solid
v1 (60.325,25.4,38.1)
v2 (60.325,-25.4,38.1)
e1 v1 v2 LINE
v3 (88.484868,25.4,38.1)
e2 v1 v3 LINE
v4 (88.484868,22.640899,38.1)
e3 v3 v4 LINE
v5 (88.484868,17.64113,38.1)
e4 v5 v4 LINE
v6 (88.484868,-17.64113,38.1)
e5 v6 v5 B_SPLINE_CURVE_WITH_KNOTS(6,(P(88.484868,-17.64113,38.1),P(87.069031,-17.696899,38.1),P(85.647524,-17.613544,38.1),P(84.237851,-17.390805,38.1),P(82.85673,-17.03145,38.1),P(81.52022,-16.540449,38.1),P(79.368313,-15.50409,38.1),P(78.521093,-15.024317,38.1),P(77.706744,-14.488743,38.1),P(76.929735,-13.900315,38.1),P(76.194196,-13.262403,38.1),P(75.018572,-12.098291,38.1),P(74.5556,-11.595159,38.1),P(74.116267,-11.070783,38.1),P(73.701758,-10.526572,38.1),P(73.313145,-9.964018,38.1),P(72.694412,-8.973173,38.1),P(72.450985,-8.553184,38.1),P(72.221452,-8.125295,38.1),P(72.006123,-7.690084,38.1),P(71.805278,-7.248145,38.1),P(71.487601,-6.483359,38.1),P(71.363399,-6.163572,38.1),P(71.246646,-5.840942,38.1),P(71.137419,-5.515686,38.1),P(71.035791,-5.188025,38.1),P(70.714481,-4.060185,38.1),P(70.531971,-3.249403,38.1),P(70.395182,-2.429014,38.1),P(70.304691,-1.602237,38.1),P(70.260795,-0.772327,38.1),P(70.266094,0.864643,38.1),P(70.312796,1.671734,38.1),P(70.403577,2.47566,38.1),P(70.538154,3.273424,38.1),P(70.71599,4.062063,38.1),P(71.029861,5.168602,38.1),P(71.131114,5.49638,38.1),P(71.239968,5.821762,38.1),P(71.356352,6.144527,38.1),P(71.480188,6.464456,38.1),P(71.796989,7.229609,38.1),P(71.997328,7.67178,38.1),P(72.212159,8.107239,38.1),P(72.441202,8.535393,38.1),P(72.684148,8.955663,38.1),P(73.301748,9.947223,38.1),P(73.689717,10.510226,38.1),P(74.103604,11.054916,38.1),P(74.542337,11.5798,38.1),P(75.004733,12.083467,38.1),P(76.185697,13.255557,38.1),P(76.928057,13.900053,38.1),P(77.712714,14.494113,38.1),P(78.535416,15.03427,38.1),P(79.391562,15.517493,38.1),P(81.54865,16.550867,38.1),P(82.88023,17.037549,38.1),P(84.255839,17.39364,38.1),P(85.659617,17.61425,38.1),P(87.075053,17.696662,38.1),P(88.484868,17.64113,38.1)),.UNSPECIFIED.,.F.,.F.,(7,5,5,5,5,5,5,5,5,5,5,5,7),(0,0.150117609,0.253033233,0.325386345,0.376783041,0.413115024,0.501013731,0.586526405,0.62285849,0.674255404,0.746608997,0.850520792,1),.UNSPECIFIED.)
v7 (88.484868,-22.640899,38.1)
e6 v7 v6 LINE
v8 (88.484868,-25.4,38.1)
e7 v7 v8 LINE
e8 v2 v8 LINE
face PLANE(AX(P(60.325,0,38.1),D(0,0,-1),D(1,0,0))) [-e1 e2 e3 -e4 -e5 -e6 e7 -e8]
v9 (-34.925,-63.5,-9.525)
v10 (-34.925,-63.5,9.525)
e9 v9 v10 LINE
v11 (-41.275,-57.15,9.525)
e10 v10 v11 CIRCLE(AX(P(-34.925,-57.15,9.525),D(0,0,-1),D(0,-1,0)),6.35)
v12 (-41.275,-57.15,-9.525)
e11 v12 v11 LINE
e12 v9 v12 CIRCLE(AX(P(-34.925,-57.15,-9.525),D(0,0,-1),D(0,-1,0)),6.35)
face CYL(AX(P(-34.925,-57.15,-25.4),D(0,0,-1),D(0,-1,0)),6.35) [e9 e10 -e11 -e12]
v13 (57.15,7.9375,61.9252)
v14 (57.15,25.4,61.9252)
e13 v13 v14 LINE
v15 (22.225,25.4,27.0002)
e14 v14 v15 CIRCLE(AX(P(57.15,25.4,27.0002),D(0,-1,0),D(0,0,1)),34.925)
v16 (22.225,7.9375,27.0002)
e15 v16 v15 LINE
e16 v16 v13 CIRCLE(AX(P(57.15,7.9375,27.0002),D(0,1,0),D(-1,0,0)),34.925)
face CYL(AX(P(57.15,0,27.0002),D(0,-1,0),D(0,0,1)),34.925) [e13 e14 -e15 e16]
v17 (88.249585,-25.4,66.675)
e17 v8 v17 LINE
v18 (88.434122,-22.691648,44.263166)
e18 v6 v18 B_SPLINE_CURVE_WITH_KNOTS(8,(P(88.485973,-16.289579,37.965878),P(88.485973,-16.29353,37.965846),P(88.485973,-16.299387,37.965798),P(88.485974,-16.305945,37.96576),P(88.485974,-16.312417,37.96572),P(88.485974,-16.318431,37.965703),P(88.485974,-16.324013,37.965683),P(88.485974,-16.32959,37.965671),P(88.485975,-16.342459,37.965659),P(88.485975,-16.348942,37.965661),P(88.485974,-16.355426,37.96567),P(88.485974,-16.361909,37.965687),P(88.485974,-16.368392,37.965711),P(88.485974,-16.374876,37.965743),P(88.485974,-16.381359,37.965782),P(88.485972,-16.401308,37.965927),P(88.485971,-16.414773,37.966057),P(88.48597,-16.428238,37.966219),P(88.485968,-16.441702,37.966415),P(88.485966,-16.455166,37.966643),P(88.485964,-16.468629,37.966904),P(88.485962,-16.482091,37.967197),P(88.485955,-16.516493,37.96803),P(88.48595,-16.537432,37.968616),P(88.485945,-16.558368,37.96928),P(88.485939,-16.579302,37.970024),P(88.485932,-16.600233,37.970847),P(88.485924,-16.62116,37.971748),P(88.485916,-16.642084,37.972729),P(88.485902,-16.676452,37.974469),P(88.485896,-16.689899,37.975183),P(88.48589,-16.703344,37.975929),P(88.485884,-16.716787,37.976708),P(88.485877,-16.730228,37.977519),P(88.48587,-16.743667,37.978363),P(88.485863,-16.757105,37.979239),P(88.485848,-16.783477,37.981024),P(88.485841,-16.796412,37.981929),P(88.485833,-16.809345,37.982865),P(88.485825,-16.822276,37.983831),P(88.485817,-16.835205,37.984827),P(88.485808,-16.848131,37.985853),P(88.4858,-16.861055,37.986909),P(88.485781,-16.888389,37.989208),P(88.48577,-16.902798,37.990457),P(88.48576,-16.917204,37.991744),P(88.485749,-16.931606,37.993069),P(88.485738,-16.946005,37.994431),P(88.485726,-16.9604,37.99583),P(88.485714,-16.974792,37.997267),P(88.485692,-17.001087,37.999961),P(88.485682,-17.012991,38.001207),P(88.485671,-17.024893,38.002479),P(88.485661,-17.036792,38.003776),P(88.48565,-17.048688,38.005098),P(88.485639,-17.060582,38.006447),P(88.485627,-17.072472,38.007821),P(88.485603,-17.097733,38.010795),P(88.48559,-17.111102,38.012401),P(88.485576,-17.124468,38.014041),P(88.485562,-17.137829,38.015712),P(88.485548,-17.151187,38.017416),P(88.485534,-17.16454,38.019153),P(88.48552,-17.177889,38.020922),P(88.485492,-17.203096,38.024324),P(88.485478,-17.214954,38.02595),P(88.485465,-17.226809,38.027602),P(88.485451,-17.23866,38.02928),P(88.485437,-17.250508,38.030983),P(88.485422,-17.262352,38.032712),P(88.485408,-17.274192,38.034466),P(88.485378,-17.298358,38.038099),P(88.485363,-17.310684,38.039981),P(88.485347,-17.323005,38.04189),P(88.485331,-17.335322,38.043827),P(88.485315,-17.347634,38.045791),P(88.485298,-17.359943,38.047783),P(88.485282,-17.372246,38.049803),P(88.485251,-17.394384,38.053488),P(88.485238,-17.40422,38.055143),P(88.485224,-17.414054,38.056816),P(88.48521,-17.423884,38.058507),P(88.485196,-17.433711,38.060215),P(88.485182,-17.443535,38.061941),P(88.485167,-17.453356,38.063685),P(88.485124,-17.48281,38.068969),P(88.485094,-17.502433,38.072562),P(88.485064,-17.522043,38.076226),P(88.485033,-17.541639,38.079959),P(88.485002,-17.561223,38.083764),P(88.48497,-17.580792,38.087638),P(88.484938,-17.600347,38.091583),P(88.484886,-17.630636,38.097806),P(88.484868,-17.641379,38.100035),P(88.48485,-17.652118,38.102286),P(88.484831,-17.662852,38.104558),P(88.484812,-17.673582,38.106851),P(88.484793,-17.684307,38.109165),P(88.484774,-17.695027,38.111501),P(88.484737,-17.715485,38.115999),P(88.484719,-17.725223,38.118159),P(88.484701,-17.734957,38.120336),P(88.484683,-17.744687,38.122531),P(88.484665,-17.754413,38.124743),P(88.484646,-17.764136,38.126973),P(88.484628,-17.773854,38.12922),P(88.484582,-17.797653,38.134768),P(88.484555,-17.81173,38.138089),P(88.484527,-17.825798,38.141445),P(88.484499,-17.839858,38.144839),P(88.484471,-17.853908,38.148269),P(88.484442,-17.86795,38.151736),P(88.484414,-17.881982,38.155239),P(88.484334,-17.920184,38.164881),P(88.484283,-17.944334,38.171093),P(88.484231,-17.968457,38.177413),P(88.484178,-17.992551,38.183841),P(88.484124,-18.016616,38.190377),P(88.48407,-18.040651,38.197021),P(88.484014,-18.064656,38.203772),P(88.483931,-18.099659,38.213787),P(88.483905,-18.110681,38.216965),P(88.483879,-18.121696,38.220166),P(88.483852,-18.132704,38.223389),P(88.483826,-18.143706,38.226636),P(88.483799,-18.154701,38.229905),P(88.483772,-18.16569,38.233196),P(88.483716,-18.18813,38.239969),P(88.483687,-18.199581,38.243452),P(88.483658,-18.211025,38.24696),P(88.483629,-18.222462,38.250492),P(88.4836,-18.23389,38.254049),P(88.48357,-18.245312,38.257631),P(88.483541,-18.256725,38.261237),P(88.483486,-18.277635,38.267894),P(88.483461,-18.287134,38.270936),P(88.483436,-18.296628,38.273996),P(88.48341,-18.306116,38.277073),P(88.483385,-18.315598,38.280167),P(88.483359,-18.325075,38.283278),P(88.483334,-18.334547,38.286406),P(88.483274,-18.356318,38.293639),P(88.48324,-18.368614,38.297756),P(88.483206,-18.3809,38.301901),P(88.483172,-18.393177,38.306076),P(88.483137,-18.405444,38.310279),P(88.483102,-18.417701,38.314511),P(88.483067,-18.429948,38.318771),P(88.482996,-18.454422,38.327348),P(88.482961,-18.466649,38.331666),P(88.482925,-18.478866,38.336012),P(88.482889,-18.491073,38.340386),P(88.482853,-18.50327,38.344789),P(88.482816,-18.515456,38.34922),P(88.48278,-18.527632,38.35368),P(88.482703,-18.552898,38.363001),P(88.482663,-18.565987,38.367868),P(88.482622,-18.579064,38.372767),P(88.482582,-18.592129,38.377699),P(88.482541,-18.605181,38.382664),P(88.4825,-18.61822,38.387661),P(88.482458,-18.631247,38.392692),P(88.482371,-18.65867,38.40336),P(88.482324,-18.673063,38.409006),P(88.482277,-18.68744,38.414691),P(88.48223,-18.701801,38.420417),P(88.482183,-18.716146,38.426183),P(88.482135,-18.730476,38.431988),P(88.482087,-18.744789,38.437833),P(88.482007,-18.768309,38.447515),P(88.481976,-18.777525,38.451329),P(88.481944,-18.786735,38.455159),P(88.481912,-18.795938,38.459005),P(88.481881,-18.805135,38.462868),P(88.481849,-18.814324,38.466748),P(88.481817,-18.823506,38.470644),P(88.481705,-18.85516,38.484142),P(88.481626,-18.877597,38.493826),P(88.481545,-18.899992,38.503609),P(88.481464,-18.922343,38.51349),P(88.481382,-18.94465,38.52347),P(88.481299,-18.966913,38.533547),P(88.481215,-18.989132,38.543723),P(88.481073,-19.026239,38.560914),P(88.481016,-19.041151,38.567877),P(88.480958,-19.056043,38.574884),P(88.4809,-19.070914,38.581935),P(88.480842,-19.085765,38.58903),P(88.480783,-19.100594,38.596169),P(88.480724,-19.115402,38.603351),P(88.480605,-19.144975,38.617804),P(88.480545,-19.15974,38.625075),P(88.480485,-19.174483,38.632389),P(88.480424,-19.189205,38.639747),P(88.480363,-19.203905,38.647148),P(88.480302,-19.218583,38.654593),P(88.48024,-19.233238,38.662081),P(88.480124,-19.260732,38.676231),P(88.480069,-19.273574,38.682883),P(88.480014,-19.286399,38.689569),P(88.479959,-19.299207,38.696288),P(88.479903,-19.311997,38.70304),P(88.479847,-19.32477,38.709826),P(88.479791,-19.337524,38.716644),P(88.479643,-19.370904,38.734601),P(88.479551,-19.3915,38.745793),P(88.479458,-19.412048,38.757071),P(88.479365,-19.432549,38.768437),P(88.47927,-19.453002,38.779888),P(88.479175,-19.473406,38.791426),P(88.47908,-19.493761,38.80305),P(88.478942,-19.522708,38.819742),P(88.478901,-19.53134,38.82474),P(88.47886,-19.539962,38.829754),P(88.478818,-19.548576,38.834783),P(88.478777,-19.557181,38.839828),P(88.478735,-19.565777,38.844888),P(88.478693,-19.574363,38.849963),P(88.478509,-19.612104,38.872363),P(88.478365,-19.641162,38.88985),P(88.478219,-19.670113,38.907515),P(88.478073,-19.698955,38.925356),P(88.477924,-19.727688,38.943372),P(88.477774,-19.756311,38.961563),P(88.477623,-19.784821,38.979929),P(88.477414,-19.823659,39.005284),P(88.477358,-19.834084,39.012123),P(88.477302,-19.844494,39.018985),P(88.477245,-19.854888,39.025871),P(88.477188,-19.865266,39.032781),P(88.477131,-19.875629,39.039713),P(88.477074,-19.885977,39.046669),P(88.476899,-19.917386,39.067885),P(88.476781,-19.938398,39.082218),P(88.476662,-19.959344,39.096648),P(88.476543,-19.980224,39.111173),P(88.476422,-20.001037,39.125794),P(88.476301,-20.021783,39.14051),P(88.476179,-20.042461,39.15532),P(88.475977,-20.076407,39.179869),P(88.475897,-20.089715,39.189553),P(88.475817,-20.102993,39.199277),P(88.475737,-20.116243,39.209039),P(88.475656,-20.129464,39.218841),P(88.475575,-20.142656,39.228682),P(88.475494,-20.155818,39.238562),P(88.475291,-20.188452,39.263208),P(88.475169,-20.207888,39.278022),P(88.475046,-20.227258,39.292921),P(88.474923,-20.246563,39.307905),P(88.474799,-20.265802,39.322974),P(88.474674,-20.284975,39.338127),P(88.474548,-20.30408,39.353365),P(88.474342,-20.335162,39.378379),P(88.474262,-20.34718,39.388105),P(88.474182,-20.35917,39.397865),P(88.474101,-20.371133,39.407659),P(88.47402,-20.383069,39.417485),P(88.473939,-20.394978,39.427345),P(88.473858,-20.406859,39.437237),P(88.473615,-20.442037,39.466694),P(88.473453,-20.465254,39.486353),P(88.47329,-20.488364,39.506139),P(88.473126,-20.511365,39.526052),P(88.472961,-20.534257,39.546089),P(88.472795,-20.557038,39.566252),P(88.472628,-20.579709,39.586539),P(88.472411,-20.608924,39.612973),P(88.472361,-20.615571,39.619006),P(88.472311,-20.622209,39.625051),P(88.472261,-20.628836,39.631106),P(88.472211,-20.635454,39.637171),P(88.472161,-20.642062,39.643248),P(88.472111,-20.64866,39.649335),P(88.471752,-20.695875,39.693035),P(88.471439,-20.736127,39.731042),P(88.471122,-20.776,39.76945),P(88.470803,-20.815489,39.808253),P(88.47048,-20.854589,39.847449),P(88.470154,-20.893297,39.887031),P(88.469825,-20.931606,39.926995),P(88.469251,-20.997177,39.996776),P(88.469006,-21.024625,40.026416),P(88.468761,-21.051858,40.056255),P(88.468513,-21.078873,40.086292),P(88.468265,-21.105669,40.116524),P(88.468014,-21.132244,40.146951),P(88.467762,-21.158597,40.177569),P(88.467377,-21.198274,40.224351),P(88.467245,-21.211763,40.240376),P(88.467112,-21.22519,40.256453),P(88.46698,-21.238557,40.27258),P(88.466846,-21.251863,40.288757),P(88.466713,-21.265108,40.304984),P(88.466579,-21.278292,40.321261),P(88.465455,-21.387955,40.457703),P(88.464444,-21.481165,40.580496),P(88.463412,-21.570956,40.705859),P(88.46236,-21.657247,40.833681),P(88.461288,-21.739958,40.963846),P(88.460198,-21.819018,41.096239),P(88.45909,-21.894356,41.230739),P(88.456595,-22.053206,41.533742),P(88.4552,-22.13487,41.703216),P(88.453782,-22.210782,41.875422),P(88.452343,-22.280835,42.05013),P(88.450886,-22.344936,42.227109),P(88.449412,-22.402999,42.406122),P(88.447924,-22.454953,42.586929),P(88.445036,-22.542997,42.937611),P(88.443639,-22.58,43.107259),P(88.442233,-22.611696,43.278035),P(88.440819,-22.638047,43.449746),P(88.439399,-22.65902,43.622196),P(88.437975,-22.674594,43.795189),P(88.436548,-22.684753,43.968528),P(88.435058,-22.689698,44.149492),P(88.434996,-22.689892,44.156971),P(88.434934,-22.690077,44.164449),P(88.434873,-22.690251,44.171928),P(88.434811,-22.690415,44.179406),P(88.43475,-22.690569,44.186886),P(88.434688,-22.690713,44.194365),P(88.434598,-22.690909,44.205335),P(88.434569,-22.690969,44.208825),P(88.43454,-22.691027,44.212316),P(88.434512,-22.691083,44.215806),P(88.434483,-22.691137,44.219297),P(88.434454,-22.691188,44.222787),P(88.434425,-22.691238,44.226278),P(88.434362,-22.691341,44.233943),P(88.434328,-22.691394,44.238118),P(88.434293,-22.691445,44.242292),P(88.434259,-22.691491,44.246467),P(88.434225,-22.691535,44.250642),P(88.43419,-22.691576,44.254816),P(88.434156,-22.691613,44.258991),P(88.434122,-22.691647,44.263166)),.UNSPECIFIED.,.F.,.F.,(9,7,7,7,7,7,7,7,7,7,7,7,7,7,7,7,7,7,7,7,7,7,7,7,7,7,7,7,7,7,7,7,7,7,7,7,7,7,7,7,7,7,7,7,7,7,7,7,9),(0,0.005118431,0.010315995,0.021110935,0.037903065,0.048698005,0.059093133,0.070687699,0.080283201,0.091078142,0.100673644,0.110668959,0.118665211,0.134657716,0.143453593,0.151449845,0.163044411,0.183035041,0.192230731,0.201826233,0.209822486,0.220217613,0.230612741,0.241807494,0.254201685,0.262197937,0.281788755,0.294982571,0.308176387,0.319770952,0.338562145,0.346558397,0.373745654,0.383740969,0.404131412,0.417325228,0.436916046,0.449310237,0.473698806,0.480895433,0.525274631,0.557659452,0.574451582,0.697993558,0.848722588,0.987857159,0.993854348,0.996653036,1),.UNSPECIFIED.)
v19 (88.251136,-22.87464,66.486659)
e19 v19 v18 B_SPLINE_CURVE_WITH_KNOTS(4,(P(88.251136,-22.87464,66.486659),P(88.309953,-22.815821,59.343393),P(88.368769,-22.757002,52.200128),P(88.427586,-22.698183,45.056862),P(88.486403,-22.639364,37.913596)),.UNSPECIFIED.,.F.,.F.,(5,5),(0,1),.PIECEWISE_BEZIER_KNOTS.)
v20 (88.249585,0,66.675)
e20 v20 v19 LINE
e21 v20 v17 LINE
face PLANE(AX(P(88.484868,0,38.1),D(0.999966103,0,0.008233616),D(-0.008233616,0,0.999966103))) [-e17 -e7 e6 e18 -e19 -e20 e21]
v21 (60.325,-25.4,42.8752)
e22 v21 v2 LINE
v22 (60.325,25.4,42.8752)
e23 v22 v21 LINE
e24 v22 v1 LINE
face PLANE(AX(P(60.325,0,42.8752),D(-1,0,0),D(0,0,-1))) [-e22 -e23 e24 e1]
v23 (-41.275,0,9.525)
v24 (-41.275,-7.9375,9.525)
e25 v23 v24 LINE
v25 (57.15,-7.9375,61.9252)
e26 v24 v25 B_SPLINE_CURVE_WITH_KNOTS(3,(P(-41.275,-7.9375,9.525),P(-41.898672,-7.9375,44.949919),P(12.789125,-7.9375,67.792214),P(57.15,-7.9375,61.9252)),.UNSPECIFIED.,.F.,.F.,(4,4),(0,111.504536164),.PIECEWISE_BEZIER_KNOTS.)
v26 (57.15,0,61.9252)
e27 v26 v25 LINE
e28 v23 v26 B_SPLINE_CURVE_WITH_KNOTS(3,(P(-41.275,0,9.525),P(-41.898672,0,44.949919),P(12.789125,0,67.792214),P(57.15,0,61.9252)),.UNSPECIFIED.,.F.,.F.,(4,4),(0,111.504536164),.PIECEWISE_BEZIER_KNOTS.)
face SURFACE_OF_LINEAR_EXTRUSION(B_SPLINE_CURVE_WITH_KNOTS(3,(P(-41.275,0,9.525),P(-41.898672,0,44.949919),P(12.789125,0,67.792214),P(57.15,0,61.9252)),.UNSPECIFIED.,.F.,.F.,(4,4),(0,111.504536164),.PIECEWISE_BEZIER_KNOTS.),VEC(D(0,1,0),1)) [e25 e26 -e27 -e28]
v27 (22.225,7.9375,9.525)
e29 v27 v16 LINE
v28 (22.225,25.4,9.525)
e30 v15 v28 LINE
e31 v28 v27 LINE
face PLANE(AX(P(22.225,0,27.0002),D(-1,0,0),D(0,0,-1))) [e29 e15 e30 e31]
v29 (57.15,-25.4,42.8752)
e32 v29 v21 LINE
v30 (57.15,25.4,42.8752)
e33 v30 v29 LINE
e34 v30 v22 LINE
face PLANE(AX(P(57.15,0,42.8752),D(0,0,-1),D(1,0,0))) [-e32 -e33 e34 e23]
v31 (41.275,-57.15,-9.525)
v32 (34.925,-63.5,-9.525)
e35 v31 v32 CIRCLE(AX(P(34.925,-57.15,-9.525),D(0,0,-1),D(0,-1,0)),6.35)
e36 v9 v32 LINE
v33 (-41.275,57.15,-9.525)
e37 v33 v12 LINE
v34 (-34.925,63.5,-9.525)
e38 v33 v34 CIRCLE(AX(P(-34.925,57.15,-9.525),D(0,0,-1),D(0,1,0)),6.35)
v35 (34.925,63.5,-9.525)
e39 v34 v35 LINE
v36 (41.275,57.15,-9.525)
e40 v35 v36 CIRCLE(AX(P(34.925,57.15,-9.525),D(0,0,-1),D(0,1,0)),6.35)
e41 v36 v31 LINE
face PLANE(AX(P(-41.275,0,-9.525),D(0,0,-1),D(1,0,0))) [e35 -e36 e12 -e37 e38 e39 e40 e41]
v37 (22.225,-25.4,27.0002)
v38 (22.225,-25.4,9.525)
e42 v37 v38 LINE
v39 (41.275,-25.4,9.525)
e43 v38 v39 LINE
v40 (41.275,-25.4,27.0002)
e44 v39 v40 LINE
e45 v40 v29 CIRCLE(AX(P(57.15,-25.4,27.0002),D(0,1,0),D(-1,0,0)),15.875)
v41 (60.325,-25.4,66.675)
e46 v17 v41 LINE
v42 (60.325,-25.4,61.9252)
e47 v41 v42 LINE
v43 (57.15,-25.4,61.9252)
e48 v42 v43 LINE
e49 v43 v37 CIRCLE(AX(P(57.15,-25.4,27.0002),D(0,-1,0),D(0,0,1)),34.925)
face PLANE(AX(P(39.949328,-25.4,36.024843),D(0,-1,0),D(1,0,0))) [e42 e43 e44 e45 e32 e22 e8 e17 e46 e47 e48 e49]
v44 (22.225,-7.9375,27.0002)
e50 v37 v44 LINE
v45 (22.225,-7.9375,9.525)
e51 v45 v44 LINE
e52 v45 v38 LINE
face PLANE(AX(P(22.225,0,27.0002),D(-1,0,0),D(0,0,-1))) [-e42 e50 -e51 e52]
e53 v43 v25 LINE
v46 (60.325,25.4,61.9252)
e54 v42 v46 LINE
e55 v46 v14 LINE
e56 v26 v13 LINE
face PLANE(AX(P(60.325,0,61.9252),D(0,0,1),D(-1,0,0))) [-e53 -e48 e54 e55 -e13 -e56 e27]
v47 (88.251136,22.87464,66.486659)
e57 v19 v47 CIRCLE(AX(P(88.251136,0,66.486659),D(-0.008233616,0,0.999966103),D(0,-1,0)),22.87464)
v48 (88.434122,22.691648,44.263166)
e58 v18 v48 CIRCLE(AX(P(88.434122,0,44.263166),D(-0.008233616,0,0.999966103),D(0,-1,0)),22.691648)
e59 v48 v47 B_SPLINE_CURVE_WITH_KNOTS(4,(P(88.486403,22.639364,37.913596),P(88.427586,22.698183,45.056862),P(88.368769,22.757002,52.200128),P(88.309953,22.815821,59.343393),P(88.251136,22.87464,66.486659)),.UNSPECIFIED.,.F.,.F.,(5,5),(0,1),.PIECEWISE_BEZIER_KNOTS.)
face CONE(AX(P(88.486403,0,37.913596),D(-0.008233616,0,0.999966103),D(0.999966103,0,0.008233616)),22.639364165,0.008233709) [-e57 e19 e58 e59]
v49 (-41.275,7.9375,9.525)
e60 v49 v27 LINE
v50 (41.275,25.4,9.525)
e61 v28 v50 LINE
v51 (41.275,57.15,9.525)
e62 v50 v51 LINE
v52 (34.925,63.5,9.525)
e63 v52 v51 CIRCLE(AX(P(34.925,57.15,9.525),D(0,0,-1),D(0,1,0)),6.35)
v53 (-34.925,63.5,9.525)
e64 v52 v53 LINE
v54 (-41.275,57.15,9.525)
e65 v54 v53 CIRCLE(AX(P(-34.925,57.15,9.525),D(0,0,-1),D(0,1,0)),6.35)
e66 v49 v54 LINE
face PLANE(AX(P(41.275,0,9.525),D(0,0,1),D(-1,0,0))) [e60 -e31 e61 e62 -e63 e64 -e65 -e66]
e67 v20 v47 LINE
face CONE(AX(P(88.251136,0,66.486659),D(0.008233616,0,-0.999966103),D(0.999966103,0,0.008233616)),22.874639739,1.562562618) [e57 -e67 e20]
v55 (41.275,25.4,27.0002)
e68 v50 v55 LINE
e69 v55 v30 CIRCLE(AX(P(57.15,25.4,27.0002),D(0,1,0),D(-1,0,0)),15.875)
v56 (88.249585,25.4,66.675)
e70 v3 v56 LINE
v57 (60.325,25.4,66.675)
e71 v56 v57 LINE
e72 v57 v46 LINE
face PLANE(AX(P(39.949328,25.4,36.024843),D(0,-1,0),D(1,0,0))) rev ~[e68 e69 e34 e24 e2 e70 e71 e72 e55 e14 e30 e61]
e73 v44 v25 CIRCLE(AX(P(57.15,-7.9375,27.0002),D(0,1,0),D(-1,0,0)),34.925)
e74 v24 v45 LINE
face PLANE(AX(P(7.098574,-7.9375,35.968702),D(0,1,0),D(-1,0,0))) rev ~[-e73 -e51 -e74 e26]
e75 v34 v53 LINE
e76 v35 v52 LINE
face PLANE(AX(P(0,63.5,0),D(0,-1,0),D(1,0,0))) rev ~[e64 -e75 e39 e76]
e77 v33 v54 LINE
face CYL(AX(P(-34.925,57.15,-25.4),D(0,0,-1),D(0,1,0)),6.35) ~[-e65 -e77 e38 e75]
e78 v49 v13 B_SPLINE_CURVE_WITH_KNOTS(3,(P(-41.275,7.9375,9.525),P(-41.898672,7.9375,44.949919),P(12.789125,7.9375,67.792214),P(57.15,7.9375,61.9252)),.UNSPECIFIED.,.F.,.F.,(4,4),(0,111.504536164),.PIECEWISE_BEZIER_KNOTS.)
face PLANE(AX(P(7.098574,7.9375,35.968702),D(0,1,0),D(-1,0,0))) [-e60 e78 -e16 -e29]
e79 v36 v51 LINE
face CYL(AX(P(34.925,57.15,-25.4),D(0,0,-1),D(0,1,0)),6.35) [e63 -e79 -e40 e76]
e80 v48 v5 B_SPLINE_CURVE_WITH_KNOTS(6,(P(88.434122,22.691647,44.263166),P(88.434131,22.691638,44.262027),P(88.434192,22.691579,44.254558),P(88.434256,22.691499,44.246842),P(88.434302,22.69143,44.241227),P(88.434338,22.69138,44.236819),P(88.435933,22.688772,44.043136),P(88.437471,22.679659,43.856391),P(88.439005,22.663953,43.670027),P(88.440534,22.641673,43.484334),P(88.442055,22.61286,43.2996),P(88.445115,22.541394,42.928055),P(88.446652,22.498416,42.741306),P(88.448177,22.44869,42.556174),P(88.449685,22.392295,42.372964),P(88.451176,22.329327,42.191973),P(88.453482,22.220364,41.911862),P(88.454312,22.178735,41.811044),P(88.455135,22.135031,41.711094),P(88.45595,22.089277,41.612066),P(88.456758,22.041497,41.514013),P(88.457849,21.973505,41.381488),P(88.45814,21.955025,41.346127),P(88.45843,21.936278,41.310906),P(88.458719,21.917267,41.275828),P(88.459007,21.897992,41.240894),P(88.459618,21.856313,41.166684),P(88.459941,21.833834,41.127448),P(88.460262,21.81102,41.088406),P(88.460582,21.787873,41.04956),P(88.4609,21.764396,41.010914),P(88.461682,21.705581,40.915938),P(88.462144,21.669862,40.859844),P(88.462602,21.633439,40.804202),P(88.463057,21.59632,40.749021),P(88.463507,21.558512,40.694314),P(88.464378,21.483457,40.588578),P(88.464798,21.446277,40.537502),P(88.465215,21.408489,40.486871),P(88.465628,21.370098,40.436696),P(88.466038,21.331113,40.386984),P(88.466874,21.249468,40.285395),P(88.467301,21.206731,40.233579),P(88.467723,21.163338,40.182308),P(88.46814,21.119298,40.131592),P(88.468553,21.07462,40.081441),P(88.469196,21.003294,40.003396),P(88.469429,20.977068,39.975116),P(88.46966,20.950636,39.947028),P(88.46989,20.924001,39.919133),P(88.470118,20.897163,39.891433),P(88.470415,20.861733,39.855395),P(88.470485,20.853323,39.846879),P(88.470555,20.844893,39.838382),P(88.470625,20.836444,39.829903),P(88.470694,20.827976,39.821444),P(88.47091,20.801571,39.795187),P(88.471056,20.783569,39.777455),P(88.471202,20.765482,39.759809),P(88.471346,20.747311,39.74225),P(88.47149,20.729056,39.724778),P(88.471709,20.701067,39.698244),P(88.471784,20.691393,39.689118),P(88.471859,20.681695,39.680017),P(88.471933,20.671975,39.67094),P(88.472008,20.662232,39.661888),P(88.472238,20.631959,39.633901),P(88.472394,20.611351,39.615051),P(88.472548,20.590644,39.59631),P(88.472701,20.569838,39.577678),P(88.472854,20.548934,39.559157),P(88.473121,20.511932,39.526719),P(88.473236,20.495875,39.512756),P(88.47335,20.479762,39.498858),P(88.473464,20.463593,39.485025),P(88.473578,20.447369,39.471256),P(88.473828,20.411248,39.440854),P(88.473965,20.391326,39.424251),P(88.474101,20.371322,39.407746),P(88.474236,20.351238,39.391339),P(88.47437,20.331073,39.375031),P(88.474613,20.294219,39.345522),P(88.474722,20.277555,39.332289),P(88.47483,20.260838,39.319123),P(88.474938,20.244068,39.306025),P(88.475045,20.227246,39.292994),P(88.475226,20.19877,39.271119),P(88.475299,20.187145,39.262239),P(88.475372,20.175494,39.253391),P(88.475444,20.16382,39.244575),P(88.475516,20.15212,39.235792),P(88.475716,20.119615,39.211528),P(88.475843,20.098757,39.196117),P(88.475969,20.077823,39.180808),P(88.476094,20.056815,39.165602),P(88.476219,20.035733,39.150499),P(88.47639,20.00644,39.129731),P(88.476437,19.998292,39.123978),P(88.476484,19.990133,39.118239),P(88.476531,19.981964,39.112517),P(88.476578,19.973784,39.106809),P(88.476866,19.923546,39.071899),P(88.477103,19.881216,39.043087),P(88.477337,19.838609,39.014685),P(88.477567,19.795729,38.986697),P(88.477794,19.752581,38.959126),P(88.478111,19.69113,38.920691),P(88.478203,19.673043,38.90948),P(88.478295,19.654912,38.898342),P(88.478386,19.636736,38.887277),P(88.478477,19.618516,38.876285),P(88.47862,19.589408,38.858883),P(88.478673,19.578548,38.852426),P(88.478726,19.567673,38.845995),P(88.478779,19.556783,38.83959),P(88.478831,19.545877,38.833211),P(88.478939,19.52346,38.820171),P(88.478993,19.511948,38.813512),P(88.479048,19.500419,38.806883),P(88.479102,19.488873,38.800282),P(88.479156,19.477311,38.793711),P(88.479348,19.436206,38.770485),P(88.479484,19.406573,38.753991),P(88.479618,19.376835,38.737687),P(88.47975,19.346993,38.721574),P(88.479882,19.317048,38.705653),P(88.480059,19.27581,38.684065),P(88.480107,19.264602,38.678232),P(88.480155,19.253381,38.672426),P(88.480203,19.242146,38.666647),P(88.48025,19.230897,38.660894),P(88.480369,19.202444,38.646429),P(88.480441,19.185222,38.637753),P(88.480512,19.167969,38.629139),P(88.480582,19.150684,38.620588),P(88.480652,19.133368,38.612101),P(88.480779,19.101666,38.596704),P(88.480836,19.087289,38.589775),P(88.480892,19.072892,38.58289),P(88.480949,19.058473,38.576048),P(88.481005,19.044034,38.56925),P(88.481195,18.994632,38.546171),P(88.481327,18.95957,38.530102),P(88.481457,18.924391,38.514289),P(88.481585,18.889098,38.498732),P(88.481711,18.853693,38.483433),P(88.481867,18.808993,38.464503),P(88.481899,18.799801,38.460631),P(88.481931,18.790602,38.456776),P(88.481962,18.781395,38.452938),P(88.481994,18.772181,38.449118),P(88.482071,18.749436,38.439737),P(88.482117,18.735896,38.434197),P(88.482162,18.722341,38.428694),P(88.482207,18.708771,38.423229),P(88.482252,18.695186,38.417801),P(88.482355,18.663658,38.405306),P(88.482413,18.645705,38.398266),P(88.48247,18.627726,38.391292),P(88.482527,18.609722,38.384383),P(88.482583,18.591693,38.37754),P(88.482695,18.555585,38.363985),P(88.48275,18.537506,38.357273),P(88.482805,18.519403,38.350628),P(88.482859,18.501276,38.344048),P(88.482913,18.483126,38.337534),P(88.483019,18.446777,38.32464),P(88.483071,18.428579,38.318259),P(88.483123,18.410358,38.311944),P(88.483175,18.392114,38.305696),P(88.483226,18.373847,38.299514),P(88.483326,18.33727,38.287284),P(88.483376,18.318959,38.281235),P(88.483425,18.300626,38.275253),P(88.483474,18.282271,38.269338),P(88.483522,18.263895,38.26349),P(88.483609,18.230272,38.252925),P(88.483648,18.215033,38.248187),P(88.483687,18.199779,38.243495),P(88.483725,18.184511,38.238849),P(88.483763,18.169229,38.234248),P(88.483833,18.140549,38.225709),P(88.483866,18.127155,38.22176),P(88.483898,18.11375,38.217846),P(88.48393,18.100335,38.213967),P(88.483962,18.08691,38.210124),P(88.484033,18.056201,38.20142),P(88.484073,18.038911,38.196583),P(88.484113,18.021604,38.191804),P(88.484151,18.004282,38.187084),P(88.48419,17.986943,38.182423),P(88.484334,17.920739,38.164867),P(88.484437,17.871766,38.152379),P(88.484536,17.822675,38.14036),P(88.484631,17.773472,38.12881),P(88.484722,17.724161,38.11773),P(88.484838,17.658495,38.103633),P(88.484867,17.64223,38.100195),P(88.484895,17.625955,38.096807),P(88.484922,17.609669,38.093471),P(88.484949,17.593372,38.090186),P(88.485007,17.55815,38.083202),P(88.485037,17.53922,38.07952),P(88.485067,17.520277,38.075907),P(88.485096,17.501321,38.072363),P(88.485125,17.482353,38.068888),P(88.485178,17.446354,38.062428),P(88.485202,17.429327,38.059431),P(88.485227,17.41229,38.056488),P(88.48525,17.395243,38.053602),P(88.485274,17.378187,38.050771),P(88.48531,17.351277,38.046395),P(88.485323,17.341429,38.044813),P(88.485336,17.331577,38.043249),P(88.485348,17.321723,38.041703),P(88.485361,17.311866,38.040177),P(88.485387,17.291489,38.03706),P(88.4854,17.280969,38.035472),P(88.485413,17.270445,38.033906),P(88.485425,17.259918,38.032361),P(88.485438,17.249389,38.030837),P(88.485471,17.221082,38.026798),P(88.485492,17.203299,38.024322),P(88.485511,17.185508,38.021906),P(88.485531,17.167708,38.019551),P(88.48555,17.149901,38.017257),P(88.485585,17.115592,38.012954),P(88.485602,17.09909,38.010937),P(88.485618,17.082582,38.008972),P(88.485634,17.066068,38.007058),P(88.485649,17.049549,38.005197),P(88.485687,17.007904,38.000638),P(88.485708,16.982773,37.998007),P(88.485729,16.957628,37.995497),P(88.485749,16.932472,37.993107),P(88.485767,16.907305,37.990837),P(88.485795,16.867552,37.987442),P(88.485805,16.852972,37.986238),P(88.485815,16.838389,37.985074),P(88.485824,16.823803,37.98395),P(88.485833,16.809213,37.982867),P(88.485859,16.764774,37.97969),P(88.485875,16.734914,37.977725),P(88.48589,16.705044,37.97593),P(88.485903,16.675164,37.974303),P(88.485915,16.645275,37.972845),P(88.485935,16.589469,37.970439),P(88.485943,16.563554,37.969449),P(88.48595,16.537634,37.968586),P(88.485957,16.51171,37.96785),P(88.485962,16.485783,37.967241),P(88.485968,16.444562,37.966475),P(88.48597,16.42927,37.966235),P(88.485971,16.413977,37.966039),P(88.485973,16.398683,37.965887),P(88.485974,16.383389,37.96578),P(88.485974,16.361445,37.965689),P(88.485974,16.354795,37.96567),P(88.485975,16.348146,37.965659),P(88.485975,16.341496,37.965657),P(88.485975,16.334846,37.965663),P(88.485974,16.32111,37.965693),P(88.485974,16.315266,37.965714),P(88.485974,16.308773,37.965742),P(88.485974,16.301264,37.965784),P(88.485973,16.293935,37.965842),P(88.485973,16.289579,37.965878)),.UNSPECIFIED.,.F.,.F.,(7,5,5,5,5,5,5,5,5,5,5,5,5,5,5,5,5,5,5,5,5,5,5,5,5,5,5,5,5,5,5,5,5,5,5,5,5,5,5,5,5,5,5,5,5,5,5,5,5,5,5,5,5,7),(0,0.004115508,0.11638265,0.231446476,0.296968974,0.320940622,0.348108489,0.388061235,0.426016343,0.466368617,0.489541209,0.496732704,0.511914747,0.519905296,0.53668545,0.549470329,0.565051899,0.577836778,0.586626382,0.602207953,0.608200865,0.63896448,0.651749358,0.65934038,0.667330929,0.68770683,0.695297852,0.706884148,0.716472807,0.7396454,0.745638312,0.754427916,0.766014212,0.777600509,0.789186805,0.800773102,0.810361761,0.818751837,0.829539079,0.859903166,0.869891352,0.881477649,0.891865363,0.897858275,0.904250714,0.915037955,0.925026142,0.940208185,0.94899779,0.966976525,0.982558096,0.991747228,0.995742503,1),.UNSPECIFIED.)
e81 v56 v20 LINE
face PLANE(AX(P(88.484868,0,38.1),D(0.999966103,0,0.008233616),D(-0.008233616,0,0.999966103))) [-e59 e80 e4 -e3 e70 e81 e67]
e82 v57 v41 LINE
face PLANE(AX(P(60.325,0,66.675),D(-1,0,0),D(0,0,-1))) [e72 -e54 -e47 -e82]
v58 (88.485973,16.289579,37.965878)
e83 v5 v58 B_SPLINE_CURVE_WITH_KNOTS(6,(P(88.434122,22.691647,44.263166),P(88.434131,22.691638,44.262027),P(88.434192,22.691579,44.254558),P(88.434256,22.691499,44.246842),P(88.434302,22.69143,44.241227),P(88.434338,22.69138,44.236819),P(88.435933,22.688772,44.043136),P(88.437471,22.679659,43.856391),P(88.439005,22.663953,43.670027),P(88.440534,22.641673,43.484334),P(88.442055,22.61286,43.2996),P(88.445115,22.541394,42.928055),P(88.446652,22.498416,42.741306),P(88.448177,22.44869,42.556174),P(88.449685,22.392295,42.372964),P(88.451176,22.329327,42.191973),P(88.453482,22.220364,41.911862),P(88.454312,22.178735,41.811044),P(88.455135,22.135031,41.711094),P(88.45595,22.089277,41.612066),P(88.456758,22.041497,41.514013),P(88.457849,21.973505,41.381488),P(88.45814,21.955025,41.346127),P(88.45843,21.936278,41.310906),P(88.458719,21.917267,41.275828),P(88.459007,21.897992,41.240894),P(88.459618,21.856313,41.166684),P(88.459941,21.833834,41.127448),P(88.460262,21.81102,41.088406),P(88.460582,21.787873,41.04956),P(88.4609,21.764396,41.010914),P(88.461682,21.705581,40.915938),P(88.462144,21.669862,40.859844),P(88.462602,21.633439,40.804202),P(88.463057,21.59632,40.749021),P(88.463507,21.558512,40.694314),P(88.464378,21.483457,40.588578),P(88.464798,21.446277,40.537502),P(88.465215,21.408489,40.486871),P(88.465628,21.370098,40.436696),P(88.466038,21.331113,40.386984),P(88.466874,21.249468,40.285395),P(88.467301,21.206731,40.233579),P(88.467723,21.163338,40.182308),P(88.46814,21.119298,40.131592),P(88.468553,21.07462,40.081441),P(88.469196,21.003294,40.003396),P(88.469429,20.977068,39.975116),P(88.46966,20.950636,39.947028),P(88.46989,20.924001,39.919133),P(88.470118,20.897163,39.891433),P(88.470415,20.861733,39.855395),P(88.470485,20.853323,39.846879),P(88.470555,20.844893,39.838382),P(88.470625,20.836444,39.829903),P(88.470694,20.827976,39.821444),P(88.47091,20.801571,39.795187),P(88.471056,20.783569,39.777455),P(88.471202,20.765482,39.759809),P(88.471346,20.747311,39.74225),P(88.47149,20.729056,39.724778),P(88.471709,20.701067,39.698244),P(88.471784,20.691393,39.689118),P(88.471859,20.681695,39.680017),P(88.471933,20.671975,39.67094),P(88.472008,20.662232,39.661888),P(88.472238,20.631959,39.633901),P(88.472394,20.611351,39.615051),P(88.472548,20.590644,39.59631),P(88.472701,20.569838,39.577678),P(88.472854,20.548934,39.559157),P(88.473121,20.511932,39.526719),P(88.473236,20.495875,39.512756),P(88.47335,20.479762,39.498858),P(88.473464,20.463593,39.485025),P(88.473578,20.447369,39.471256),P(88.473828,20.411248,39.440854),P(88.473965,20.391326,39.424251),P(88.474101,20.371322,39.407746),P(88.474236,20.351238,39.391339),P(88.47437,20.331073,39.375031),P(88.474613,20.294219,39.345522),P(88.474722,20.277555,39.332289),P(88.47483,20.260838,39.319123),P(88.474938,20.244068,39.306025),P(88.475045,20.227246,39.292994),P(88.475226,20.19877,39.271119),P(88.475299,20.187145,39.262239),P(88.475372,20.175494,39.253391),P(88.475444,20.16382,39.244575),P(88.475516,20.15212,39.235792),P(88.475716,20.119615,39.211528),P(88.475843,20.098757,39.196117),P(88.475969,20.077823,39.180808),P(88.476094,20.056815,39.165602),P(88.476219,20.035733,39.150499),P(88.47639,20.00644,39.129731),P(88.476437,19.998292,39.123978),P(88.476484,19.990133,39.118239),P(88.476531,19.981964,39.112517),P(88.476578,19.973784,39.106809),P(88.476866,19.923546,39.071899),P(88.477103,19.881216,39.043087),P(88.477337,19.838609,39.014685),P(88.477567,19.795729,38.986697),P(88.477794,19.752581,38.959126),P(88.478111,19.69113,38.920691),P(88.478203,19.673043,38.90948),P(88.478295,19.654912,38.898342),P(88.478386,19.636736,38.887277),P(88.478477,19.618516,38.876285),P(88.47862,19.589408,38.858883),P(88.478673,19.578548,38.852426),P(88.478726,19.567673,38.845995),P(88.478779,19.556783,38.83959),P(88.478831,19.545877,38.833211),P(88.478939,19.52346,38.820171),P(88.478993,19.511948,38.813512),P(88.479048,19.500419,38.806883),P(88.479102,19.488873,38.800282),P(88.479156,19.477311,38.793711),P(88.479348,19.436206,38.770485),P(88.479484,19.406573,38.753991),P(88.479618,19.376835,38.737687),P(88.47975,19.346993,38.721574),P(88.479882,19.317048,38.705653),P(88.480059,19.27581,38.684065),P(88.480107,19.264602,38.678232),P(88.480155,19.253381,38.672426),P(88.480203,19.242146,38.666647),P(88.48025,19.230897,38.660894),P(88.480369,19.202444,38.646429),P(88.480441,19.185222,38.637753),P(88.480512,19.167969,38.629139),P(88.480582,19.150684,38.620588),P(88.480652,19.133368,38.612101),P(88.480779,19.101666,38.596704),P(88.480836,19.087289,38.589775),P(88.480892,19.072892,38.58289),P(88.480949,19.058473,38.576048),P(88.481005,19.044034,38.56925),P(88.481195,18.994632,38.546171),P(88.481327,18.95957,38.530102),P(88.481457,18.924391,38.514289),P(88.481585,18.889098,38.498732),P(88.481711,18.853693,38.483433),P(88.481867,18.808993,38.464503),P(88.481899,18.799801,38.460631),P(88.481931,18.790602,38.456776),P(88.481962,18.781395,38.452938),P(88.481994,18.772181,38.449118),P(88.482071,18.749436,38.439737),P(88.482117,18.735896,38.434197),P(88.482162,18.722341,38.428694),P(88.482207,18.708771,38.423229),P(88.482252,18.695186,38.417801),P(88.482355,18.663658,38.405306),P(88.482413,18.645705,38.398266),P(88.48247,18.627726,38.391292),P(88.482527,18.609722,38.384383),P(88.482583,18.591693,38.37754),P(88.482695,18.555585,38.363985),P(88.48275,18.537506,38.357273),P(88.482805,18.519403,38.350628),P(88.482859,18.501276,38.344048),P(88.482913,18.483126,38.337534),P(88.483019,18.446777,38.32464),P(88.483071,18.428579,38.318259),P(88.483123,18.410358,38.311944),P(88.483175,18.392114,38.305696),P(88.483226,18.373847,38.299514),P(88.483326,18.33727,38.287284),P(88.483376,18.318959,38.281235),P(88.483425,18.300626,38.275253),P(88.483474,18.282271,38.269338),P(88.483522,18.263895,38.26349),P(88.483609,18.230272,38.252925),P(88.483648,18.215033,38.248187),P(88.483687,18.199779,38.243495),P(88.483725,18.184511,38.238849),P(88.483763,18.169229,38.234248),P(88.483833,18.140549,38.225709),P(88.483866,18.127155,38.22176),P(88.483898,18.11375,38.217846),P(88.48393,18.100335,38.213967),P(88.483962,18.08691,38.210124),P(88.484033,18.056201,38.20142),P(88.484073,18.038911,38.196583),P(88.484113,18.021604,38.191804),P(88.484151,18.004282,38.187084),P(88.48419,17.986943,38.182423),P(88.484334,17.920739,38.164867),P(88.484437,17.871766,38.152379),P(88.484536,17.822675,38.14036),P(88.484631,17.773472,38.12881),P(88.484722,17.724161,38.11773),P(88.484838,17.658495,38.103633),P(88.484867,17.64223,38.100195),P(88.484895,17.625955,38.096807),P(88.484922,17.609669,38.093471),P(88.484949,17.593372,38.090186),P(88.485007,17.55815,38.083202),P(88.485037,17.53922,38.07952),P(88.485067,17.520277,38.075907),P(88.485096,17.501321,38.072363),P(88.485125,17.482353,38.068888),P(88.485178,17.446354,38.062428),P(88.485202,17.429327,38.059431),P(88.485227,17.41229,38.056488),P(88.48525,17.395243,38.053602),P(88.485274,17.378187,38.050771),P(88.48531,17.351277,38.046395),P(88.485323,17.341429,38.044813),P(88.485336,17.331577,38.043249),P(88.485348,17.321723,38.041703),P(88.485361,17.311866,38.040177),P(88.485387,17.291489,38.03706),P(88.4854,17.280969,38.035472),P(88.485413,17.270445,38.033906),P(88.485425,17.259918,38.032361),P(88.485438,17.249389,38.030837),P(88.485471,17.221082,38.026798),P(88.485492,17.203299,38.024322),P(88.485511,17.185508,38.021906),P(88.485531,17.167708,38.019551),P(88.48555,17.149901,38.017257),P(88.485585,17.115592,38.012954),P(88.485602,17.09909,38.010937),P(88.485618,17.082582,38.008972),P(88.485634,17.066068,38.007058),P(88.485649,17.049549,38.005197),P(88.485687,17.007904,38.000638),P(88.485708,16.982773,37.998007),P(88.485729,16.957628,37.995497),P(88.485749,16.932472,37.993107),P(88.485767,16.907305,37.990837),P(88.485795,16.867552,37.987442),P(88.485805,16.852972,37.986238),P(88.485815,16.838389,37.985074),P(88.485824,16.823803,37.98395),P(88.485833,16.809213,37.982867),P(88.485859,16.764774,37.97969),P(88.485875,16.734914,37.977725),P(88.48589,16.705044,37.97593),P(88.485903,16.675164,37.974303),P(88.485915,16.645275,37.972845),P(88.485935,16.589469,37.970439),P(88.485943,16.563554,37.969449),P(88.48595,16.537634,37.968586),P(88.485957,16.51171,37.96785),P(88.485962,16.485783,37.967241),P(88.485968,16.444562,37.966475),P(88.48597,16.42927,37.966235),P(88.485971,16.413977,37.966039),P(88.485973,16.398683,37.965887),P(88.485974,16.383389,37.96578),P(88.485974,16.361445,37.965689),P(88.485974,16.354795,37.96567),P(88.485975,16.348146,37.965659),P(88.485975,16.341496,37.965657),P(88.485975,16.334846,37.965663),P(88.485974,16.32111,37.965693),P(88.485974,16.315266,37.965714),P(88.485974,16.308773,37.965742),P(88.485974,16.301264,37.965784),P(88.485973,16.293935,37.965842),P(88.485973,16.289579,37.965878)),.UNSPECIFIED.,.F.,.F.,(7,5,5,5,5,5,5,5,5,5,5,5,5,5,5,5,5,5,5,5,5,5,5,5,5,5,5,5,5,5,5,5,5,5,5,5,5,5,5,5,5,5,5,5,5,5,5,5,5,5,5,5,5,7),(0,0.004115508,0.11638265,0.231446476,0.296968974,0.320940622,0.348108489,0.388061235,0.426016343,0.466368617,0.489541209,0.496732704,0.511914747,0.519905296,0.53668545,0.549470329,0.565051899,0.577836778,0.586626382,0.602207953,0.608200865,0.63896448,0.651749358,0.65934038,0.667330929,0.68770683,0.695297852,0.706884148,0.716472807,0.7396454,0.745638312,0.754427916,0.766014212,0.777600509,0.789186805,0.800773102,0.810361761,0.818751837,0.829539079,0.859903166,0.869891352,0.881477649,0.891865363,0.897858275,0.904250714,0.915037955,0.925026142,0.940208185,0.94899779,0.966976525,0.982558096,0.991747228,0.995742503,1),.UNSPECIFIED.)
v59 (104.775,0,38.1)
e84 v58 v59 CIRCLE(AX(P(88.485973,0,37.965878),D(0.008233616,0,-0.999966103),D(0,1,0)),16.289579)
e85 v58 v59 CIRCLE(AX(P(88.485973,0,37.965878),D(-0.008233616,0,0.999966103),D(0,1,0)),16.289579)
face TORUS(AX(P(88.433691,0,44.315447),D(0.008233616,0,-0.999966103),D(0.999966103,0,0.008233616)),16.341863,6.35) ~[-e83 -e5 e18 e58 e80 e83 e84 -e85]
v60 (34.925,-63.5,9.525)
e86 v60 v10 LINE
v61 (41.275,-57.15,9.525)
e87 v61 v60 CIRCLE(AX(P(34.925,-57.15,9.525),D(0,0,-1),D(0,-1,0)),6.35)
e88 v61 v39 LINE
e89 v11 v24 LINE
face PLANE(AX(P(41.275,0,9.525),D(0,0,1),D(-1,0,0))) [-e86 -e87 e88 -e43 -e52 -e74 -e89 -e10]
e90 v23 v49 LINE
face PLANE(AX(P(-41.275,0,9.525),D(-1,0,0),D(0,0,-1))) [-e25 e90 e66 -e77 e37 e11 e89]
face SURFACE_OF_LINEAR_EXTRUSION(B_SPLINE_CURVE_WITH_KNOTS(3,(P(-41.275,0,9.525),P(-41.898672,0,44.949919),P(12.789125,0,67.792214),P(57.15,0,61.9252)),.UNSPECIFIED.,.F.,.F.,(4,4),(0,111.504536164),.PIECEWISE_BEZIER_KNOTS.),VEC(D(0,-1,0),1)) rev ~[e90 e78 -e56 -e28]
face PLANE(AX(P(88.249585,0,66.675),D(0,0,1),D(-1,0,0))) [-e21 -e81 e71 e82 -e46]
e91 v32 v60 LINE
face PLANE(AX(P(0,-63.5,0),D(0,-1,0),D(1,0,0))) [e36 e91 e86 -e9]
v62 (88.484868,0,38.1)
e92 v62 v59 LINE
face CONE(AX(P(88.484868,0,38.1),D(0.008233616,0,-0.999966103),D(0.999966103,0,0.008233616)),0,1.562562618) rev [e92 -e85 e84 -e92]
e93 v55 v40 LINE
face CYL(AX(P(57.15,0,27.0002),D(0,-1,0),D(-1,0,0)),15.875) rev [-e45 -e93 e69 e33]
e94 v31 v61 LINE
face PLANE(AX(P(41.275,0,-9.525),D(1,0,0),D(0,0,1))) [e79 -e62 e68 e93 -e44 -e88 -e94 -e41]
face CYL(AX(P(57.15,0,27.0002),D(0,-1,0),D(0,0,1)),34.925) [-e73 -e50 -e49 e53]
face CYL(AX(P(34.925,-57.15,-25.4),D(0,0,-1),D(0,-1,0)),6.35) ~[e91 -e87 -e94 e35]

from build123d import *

# Parameters (mm, degrees)
F1_DEPTH    = 63.5
F2_DEPTH    = 25.4
F3_DEPTH    = 7.9375
F5_T1_DEPTH = 50.8


# Not quite as in the source:
# - a fillet or chamfer that OpenCascade refuses, or shapes differently, is made with other operations: its cross-section is extruded or revolved along the edge and cut away or added


with BuildPart() as f1:
    # F0 (on Front) → F1 (new body, symmetric)
    with BuildSketch(Plane.XZ):
        Polygon((22.225, 9.525), (-41.275, 9.525), (-41.275, -9.525), (41.275, -9.525), (41.275, 9.525), align=None)
    extrude(amount=F1_DEPTH, both=True)

    # F0 (on Front) → F2 (join, symmetric)
    with BuildSketch(Plane.XZ):
        with BuildLine():
            Line((22.225, 27.0002), (22.225, 9.525))
            Line((22.225, 9.525), (41.275, 9.525))
            Line((41.275, 9.525), (41.275, 27.0002))
            ThreePointArc((41.275, 27.0002), (45.9246798487, 38.2255201513), (57.15, 42.8752))
            Line((57.15, 42.8752), (60.325, 42.8752))
            Line((60.325, 42.8752), (60.325, 61.9252))
            Line((60.325, 61.9252), (57.15, 61.9252))
            ThreePointArc((57.15, 61.9252), (32.4542956671, 51.6959043329), (22.225, 27.0002))
        make_face()
        Polygon((60.325, 66.675), (60.325, 61.9252), (60.325, 42.8752), (60.325, 38.1), (88.4848684072, 38.1), (88.2495848575, 66.675), align=None)
    extrude(amount=F2_DEPTH, both=True)

    # F0 (on Front) → F3 (join, symmetric)
    with BuildSketch(Plane.XZ):
        with BuildLine():
            add(Edge.make_bspline(
                [(-41.275, 9.525), (-41.8986715376, 44.9499189854), (12.7891246229, 67.7922144532), (57.15, 61.9252)],
                knots=[0, 0, 0, 0, 111.5045361635, 111.5045361635, 111.5045361635, 111.5045361635], degree=3))
            Line((-41.275, 9.525), (22.225, 9.525))
            Line((22.225, 9.525), (22.225, 27.0002))
            ThreePointArc((22.225, 27.0002), (32.4542956671, 51.6959043329), (57.15, 61.9252))
        make_face()
    extrude(amount=F3_DEPTH, both=True)

    # F0 (on Front) → F4 (revolve)
    with BuildSketch(Plane.XZ):
        Polygon((111.125, 66.675), (88.2495848575, 66.675), (88.4848684072, 38.1), (111.125, 38.1), align=None)
    revolve(axis=Axis((88.3672266324, 0, 52.3875), (-0.0082336159, 0, 0.9999661032)))

    # F5: fillet of radius 6.35 on 5 edges, made by hand

    # F5_s2 → F5_t1 (cut)
    with BuildSketch(Plane.XY.offset(-25.4)):
        with BuildLine():
            ThreePointArc((34.925, -63.5), (39.4151280605, -61.6401280605), (41.275, -57.15))
            Line((41.275, -57.15), (41.275, -63.5))
            Line((41.275, -63.5), (34.925, -63.5))
        make_face()
        with BuildLine():
            ThreePointArc((34.925, 63.5), (39.4151280605, 61.6401280605), (41.275, 57.15))
            Line((41.275, 57.15), (41.275, 63.5))
            Line((41.275, 63.5), (34.925, 63.5))
        make_face()
        with BuildLine():
            ThreePointArc((-34.925, 63.5), (-39.4151280605, 61.6401280605), (-41.275, 57.15))
            Line((-41.275, 57.15), (-41.275, 63.5))
            Line((-41.275, 63.5), (-34.925, 63.5))
        make_face()
        with BuildLine():
            ThreePointArc((-34.925, -63.5), (-39.4151280605, -61.6401280605), (-41.275, -57.15))
            Line((-41.275, -57.15), (-41.275, -63.5))
            Line((-41.275, -63.5), (-34.925, -63.5))
        make_face()
    extrude(amount=F5_T1_DEPTH, mode=Mode.SUBTRACT)


with BuildPart() as f5_tool4:
    # F5_s5 → F5_t6 (revolve)
    with BuildSketch(Plane.XZ):
        with BuildLine():
            ThreePointArc((111.125, 44.45), (109.2651280605, 39.9598719395), (104.775, 38.1))
            Line((104.775, 38.1), (111.125, 38.1))
            Line((111.125, 38.1), (111.125, 44.45))
        make_face()
    revolve(axis=Axis((88.4864032368, 0, 37.9135961712), (-0.0082336159, 0, 0.9999661032)))

    split(bisect_by=Plane(origin=(88.7925599353, 0, 0.7311086157), x_dir=(0, 1, 0), z_dir=(0.9999661032, 0, 0.0082336159)), keep=Keep.TOP)

    split(bisect_by=Plane.XY.offset(38.1), keep=Keep.TOP)


with BuildPart() as f1_1:
    add(f1.part)

    # F5_t3: cut F5_tool4
    add(f5_tool4.part, mode=Mode.SUBTRACT)


with BuildPart() as f5_tool10:
    # F5_s11 → F5_t12 (revolve)
    with BuildSketch(Plane.XZ):
        with BuildLine():
            ThreePointArc((111.125, 44.45), (109.2651280605, 39.9598719395), (104.775, 38.1))
            Line((104.775, 38.1), (111.125, 38.1))
            Line((111.125, 38.1), (111.125, 44.45))
        make_face()
    revolve(axis=Axis((88.4864032368, 0, 37.9135961712), (-0.0082336159, 0, 0.9999661032)))

    split(bisect_by=Plane(origin=(88.7925599353, 0, 0.7311086157), x_dir=(0, 1, 0), z_dir=(0.9999661032, 0, 0.0082336159)), keep=Keep.TOP)

    split(bisect_by=Plane.XY.offset(38.1), keep=Keep.BOTTOM)


with BuildPart() as f1_2:
    add(f1_1.part)

    # F5_t9: cut F5_tool10
    add(f5_tool10.part, mode=Mode.SUBTRACT)


with BuildPart() as f5_tool16:
    # F5_s17 → F5_t18 (revolve)
    with BuildSketch(Plane.XZ):
        with BuildLine():
            ThreePointArc((111.125, 44.45), (109.2651280605, 39.9598719395), (104.775, 38.1))
            Line((104.775, 38.1), (111.125, 38.1))
            Line((111.125, 38.1), (111.125, 44.45))
        make_face()
    revolve(axis=Axis((88.4864032368, 0, 37.9135961712), (-0.0082336159, 0, 0.9999661032)))

    split(bisect_by=Plane(origin=(88.7925599353, 0, 0.7311086157), x_dir=(0, 1, 0), z_dir=(-0.9999661032, 0, -0.0082336159)), keep=Keep.TOP)

    split(bisect_by=Plane.XY.offset(38.1), keep=Keep.BOTTOM)


with BuildPart() as f1_3:
    add(f1_2.part)

    # F5_t15: cut F5_tool16
    add(f5_tool16.part, mode=Mode.SUBTRACT)


solid = f1_3.part
